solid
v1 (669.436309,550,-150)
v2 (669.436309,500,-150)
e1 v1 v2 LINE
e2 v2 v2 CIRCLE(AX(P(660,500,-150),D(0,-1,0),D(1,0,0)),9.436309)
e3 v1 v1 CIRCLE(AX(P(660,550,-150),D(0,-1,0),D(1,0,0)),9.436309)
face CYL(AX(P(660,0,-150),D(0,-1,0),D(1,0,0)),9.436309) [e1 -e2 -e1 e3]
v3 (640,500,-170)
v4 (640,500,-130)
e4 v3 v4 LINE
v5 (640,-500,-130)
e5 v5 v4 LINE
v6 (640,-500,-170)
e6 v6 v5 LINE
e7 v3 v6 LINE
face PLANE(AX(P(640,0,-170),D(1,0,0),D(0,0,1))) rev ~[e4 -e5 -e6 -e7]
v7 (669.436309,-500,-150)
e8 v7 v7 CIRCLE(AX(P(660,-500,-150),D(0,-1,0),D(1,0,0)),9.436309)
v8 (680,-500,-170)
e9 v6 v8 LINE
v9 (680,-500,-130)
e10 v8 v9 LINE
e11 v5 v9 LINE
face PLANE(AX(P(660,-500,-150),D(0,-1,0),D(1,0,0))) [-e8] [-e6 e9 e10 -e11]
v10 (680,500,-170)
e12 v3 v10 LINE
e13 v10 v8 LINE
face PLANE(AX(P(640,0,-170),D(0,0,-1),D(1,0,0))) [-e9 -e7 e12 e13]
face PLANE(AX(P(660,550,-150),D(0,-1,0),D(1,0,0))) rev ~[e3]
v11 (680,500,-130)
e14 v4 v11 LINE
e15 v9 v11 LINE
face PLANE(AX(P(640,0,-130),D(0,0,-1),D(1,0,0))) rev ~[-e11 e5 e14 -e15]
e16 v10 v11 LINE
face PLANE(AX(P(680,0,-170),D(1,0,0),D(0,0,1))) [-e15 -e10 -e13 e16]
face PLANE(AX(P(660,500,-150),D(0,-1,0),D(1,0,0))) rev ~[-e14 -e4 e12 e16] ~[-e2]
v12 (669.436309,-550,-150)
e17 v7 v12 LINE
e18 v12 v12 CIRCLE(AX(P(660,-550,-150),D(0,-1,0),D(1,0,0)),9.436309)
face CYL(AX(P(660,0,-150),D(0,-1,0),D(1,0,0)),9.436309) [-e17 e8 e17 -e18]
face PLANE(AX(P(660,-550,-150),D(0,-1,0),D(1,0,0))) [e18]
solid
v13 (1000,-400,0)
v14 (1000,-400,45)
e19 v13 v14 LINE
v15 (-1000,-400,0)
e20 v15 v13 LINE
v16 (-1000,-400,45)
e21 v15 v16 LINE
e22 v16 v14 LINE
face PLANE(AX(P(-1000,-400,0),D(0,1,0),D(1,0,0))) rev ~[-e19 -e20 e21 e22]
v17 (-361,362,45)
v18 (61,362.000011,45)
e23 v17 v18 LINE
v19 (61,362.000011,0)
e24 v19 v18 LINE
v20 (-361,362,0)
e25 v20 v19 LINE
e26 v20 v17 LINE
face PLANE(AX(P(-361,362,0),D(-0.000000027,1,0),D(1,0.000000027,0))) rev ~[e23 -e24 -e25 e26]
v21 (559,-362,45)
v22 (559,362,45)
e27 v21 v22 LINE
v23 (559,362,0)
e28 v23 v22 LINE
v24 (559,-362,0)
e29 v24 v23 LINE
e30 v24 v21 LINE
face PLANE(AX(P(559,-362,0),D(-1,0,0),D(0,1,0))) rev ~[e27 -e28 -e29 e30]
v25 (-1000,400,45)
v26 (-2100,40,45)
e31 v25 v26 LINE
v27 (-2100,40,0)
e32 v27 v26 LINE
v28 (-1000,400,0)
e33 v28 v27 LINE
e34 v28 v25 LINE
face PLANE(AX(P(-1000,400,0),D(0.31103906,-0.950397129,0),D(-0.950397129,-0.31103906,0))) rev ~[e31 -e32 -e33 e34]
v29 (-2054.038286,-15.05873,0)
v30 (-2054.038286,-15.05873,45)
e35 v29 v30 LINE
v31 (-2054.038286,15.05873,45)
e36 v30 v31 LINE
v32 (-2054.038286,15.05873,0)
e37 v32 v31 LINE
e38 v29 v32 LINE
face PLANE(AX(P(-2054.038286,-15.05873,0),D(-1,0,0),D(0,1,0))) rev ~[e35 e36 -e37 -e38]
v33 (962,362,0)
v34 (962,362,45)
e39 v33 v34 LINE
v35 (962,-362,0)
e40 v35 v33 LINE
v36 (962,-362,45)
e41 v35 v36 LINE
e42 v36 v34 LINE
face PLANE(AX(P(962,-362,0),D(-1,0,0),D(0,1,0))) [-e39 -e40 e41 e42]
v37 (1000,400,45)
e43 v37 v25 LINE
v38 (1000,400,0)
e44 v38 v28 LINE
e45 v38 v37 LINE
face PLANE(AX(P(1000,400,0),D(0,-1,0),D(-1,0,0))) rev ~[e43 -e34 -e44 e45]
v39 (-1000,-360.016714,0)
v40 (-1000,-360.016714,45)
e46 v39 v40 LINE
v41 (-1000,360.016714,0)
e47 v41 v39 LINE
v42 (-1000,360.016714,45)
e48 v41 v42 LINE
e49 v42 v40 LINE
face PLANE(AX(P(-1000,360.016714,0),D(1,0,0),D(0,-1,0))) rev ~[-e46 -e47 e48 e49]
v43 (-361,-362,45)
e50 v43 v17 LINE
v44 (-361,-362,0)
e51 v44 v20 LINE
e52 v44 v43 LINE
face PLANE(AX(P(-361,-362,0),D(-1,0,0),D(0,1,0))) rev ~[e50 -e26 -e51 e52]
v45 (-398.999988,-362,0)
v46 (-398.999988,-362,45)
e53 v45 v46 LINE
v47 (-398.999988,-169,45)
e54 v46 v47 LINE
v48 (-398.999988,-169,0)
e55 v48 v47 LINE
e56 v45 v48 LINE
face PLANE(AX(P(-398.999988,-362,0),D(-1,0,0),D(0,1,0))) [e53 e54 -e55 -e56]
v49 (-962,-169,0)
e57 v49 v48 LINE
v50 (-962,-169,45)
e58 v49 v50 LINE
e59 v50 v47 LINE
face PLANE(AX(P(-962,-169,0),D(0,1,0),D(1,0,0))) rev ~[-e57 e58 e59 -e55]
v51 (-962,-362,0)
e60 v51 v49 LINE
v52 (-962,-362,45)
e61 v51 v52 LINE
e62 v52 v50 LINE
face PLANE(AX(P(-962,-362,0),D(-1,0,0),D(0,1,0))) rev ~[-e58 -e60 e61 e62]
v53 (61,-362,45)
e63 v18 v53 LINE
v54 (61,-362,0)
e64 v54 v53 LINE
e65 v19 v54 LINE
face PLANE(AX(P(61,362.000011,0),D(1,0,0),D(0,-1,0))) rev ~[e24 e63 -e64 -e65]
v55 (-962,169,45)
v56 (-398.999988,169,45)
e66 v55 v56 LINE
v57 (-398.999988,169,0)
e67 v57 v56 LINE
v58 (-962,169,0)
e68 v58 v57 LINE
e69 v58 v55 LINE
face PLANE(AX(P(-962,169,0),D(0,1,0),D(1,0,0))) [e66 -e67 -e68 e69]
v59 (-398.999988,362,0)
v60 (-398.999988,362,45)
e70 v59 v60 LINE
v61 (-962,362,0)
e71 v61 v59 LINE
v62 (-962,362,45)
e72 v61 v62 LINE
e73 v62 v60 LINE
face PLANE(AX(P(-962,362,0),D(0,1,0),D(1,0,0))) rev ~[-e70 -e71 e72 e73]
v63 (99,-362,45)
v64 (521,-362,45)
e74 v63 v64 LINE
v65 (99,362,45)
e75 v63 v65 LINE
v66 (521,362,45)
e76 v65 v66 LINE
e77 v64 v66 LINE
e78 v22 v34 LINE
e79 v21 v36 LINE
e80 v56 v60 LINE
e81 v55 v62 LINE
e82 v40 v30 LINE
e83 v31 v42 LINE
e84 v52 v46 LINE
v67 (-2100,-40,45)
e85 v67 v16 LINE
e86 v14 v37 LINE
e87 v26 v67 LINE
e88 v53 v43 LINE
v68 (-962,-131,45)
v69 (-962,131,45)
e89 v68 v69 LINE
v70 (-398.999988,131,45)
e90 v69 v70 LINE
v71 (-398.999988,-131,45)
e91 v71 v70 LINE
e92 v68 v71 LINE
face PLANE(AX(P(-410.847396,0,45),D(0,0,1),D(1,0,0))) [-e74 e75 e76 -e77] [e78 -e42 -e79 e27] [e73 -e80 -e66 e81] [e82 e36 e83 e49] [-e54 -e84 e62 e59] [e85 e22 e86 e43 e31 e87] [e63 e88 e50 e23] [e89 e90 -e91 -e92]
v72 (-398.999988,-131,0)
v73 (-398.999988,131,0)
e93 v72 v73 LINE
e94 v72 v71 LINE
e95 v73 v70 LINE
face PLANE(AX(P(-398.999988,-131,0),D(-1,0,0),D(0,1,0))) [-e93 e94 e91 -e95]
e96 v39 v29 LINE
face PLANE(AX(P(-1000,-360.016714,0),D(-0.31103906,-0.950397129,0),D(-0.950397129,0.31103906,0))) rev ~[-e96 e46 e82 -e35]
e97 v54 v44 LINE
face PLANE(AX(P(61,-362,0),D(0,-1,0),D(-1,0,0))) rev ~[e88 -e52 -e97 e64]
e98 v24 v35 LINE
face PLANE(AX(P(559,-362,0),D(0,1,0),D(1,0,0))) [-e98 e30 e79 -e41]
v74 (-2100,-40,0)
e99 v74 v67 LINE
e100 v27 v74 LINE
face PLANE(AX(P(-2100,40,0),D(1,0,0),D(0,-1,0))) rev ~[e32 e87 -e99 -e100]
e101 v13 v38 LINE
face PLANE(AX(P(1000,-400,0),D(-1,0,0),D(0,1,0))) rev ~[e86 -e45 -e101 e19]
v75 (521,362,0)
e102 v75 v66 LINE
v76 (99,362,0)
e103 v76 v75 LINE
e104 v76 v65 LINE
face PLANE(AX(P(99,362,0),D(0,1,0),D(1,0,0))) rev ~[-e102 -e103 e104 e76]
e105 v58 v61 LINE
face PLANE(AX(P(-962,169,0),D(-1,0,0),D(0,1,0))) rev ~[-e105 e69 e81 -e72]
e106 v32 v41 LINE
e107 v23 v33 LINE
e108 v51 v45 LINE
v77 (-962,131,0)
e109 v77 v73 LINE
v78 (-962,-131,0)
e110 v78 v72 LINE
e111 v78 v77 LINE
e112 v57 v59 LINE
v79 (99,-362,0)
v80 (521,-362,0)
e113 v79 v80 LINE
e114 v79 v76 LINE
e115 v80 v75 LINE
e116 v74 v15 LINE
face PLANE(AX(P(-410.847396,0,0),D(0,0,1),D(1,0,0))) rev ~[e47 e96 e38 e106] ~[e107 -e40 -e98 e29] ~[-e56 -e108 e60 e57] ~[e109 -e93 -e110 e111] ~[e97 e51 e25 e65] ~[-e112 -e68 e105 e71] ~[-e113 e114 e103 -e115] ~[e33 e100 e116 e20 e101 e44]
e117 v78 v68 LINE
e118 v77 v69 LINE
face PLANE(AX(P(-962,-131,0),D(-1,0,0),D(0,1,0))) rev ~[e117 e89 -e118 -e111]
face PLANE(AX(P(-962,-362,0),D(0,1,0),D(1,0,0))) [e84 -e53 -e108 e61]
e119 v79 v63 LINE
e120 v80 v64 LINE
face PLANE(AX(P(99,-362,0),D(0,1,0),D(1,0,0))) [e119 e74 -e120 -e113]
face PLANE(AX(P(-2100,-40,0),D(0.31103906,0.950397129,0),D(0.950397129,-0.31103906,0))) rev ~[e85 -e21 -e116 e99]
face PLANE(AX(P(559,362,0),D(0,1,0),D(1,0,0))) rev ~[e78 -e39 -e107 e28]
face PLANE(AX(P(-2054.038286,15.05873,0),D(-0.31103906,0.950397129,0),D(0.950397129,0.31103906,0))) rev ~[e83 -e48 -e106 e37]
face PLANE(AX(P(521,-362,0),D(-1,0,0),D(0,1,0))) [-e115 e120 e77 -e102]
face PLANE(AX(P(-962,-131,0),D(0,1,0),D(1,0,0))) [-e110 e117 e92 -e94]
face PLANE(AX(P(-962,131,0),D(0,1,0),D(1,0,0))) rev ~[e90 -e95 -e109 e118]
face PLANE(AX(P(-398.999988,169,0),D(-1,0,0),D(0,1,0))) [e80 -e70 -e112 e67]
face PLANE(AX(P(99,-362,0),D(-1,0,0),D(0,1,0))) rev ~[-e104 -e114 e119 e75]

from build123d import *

# Parameters (mm, degrees)
F0_W     = 563.0000123978
F0_H     = 193
F0_H_2   = 262
F0_W_2   = 422
F0_H_3   = 724
F0_W_3   = 403
F1_DEPTH = 45
F2_W     = 40
F2_H     = 40
F2_R     = 9.4363088756
F3_DEPTH = 500
F4_DEPTH = 550


# Not quite as in the source:
# - ends of sketch curves that miss each other by under 0.0002 mm in the source are joined


with BuildPart() as f1:
    # F0 (on Top) → F1 (new body)
    with BuildSketch(Plane.XY):
        Polygon((1000, -400), (1000, 400), (-1000, 400), (-2100, 40), (-2100, -40), (-1000, -400), align=None)
        with Locations((-680.4999938011, -265.5)):
            Rectangle(F0_W, F0_H, mode=Mode.SUBTRACT)
        Polygon((-2054.0382862091, 15.0587296583), (-1000, 360.0167142359), (-1000, -360.0167142359), (-2054.0382862091, -15.0587296583), align=None, mode=Mode.SUBTRACT)
        with Locations((-680.4999938011, 0)):
            Rectangle(F0_W, F0_H_2, mode=Mode.SUBTRACT)
        with Locations((-680.4999938011, 265.5)):
            Rectangle(F0_W, F0_H, mode=Mode.SUBTRACT)
        Polygon((-361, -362), (-361, 362), (61, 362.0000114441), (61, -362), align=None, mode=Mode.SUBTRACT)
        with Locations((310, 0)):
            Rectangle(F0_W_2, F0_H_3, mode=Mode.SUBTRACT)
        with Locations((760.5, 0)):
            Rectangle(F0_W_3, F0_H_3, mode=Mode.SUBTRACT)
    extrude(amount=F1_DEPTH)


with BuildPart() as f3:
    # F2 (on Front) → F3 (new body, symmetric)
    with BuildSketch(Plane.XZ):
        with Locations((660, -150)):
            Rectangle(F2_W, F2_H)
        with Locations((660, -150)):
            Circle(F2_R, mode=Mode.SUBTRACT)
    extrude(amount=F3_DEPTH, both=True)

    # F2 (on Front) → F4 (join, symmetric)
    with BuildSketch(Plane.XZ):
        with Locations((660, -150)):
            Circle(F2_R)
    extrude(amount=F4_DEPTH, both=True)


solid = Compound([f1.part, f3.part])
